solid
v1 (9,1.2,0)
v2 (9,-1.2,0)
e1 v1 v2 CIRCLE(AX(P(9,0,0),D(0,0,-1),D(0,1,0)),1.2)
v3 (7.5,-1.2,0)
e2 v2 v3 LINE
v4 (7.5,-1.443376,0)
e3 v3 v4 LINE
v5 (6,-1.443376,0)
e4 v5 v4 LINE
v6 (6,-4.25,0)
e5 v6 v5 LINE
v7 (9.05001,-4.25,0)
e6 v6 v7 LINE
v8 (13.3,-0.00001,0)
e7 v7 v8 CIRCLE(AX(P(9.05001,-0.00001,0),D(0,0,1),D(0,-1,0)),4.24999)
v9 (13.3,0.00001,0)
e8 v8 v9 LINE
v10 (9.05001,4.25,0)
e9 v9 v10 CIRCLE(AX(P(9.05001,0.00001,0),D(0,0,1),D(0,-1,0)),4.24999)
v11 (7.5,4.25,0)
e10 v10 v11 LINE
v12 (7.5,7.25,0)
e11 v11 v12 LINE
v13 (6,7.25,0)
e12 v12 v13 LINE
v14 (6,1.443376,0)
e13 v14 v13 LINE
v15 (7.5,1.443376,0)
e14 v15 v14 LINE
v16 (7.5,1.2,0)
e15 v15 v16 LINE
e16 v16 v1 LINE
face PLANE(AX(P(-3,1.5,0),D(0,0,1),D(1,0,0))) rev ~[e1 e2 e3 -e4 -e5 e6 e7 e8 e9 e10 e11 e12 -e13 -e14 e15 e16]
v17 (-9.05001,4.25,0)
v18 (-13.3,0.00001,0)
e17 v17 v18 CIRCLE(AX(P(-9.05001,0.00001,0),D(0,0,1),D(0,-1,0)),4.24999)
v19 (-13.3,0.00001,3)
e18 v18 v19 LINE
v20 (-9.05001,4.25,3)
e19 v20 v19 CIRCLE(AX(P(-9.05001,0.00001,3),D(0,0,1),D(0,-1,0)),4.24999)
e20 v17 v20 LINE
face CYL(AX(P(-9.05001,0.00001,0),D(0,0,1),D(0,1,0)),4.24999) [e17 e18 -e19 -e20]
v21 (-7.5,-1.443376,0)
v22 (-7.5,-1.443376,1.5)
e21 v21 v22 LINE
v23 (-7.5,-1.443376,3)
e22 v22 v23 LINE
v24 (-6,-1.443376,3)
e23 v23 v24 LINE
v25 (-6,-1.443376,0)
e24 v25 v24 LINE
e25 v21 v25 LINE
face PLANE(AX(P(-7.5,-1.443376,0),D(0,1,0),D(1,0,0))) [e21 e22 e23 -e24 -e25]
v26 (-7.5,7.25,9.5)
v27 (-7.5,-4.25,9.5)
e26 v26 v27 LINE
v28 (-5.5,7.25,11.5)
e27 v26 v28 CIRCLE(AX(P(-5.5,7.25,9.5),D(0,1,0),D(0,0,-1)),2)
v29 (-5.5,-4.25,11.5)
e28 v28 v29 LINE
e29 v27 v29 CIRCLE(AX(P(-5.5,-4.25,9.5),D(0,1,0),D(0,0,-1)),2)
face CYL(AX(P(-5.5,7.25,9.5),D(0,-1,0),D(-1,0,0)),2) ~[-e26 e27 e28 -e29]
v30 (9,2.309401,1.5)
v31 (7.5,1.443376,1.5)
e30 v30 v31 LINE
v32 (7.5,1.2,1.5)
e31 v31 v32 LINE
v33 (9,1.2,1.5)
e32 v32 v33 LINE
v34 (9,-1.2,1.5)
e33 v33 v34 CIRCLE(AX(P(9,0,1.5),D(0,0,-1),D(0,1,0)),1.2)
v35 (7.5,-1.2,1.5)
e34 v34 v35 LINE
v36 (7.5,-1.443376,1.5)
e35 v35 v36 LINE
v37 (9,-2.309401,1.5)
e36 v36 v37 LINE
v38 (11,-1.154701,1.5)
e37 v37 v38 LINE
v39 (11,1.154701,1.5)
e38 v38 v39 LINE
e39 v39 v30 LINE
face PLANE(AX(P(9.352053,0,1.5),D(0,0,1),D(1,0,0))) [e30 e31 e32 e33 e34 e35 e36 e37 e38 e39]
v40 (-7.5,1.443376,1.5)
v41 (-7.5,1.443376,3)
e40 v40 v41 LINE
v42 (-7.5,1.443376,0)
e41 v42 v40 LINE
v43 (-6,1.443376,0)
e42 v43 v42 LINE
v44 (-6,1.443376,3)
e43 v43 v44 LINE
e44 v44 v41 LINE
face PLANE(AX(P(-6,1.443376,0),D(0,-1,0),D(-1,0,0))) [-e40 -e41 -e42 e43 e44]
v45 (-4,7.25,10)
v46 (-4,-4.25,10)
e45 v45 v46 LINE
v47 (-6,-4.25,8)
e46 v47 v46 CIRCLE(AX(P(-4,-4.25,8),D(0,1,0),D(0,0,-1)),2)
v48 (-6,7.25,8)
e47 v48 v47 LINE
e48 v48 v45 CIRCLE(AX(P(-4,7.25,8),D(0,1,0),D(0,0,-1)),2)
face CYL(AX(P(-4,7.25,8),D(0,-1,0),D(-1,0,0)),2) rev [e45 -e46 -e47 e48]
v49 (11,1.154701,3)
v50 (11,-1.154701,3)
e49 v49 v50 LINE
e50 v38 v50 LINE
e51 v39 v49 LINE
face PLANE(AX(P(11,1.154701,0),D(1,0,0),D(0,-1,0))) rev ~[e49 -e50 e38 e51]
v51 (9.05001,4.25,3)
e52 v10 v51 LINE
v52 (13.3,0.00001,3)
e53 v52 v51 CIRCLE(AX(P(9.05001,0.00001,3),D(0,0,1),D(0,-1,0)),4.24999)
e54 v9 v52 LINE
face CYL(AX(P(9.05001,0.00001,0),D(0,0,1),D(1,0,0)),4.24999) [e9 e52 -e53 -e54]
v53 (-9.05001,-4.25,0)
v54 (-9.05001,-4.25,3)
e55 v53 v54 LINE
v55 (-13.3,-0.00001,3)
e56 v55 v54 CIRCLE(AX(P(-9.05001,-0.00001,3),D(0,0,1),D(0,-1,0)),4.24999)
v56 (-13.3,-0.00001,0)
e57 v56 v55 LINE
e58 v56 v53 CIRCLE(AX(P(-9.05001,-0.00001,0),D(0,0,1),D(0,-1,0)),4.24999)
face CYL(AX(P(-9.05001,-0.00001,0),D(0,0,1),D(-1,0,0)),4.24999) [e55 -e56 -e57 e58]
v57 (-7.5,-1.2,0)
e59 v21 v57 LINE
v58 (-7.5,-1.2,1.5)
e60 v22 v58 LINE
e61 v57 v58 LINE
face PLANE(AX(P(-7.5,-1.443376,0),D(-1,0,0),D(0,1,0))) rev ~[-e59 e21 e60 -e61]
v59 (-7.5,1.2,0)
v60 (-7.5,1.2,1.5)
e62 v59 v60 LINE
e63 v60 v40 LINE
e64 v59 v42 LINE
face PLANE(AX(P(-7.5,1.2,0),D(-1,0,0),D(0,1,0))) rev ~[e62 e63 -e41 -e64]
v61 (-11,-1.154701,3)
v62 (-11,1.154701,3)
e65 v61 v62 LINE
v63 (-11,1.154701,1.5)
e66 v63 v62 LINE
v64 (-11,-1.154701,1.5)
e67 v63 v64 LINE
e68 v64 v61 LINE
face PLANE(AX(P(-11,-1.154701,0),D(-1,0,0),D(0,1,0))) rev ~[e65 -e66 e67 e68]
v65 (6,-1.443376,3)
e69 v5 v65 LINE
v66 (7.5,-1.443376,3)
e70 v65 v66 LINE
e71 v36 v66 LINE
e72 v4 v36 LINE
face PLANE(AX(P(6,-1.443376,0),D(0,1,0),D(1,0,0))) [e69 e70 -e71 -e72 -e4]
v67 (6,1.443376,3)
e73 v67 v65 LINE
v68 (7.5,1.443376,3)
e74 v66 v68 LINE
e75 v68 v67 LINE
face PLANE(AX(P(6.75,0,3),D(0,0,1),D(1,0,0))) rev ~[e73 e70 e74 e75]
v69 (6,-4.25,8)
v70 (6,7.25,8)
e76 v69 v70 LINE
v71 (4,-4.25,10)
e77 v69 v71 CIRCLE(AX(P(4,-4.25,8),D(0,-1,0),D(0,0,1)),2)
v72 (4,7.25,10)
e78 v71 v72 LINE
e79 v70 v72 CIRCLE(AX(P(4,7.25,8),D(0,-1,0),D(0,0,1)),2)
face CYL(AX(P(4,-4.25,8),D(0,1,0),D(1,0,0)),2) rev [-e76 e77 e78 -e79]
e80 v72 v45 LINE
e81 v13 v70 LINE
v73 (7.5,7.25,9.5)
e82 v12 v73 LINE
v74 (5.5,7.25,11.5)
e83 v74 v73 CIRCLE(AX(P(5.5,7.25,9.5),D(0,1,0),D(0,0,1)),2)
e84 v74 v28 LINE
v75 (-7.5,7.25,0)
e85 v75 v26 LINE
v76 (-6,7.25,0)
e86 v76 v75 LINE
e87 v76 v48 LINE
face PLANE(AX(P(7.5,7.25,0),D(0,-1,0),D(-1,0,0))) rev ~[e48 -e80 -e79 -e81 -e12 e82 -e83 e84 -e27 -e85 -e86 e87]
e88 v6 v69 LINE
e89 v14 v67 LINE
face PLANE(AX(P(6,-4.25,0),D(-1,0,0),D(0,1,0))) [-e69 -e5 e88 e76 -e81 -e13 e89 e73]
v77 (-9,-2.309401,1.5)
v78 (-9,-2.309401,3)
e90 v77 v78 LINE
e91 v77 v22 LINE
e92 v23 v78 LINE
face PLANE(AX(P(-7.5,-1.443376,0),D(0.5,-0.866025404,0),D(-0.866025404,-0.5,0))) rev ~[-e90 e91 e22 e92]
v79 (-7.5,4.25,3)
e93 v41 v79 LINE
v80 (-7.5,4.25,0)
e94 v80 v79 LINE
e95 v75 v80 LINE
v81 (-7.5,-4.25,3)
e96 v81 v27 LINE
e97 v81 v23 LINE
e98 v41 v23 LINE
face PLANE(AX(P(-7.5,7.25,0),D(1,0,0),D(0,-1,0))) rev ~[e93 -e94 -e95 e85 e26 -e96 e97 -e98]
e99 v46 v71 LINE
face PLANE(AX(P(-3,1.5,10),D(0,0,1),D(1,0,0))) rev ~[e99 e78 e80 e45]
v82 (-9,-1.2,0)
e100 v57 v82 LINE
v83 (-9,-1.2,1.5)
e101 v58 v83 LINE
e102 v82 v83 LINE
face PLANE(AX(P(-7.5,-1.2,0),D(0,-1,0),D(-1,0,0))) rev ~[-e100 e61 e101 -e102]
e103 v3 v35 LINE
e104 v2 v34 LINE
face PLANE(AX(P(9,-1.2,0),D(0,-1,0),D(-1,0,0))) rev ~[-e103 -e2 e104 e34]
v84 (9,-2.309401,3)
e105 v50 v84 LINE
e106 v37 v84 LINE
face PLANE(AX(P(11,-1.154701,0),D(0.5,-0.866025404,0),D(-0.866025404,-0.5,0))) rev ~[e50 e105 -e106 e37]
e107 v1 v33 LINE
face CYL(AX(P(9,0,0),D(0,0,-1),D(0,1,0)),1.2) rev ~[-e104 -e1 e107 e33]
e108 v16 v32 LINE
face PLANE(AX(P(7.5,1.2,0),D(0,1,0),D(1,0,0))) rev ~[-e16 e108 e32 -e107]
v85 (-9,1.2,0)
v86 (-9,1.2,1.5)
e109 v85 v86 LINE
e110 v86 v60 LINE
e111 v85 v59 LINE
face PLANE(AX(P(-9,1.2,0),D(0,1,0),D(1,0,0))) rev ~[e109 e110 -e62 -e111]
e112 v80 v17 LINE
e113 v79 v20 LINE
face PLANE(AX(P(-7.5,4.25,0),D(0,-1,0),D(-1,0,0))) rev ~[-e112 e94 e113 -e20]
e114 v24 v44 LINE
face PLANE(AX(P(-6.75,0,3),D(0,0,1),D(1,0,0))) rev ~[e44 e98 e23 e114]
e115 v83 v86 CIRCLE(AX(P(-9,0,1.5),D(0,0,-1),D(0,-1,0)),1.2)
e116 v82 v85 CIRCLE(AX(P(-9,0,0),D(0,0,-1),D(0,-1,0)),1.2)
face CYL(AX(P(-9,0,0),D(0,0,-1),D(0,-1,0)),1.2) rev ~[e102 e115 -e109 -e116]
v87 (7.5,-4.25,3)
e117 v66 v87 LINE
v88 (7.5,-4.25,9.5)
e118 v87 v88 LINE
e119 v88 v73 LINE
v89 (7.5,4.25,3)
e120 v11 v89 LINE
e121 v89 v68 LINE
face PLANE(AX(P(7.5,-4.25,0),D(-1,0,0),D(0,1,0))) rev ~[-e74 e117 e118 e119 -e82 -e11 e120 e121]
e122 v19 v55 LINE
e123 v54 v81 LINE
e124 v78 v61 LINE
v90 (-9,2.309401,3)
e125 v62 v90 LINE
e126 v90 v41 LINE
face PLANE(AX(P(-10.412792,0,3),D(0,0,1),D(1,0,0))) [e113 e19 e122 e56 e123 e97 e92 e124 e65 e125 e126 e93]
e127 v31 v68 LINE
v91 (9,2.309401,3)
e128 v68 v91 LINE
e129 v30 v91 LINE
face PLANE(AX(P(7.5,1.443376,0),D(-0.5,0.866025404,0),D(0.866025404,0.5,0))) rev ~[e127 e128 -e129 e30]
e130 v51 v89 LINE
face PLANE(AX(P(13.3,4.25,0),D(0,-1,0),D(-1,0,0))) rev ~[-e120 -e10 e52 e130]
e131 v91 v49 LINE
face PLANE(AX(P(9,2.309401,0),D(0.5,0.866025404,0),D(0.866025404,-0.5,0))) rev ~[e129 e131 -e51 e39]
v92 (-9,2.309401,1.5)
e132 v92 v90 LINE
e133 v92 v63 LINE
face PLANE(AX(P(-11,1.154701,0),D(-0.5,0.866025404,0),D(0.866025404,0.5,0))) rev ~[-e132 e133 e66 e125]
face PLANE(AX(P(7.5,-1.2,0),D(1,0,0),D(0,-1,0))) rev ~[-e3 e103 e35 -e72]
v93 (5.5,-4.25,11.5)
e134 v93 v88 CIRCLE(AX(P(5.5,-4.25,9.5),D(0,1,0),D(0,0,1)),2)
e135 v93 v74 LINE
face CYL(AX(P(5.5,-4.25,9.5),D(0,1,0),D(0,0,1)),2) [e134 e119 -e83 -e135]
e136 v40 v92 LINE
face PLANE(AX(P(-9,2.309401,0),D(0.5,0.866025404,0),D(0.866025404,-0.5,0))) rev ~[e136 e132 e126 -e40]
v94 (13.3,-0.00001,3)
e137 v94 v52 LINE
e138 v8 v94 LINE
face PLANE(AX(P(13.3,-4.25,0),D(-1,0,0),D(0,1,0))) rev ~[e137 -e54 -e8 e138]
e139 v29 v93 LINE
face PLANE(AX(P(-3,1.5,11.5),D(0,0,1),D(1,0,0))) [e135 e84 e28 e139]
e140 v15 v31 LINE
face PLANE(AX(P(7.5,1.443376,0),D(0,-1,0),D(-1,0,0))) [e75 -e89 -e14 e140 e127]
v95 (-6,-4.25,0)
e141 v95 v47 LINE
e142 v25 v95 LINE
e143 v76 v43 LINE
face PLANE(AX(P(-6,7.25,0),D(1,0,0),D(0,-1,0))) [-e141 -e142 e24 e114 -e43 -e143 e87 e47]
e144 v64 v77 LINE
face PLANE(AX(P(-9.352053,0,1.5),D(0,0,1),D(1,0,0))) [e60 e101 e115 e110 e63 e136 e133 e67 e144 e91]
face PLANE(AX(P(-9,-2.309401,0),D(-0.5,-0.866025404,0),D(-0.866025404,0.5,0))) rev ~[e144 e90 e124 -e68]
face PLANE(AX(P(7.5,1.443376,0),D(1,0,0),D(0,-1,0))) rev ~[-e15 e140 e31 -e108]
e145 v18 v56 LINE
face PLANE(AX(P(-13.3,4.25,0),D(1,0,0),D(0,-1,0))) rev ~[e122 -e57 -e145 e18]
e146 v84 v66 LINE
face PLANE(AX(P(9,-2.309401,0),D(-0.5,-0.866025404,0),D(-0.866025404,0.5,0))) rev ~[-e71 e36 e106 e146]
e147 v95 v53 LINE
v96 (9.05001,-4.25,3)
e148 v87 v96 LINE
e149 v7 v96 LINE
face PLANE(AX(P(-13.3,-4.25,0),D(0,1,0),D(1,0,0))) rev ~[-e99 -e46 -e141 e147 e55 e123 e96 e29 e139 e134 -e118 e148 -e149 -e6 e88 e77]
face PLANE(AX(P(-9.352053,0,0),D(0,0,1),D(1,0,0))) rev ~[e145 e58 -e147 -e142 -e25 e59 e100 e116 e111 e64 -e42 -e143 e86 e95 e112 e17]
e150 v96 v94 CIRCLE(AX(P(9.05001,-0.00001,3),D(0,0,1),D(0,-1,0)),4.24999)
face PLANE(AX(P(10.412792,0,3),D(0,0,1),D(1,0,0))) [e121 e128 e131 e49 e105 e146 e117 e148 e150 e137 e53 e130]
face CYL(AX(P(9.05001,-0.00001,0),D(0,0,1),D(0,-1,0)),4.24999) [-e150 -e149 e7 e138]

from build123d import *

# Parameters (mm, degrees)
F0_W     = 1.5
F0_H     = 2.806624327
F1_DEPTH = 11.5
F2_DEPTH = 10
F3_DEPTH = 3
F4_DEPTH = 3
F5_DEPTH = 1.5
F6_R     = 4.24999
F7_R     = 2


# Not quite as in the source:
# - a fillet or chamfer is up to 0.001 mm smaller than in the source, because OpenCascade refuses the exact size


with BuildPart() as f1:
    # F0 (on Top) → F1 (new body)
    with BuildSketch(Plane.XY):
        Polygon((-6, 7.25), (-6, 1.443375673), (-6, -1.443375673), (-6, -4.25), (0, -4.25), (0, 7.25), align=None)
        Polygon((-7.5, 4.25), (-7.5, 1.443375673), (-6, 1.443375673), (-6, 7.25), (-7.5, 7.25), align=None)
        Polygon((-7.5, 1.443375673), (-7.5, 1.1999995727), (-7.5, -1.1999995727), (-7.5, -1.443375673), (-6, -1.443375673), (-6, 1.443375673), align=None)
        with Locations((-6.75, -2.8466878365)):
            Rectangle(F0_W, F0_H)
        Polygon((6, 7.25), (0, 7.25), (0, -4.25), (6, -4.25), (6, -1.443375673), (6, 1.443375673), align=None)
        Polygon((7.5, 7.25), (6, 7.25), (6, 1.443375673), (7.5, 1.443375673), (7.5, 4.25), align=None)
        Polygon((7.5, 1.443375673), (6, 1.443375673), (6, -1.443375673), (7.5, -1.443375673), (7.5, -1.1999995727), (7.5, 1.1999995727), align=None)
        with Locations((6.75, -2.8466878365)):
            Rectangle(F0_W, F0_H)
    extrude(amount=F1_DEPTH)

    # F0 (on Top) → F2 (cut)
    with BuildSketch(Plane.XY):
        Polygon((-6, 7.25), (-6, 1.443375673), (-6, -1.443375673), (-6, -4.25), (0, -4.25), (0, 7.25), align=None)
        Polygon((6, 7.25), (0, 7.25), (0, -4.25), (6, -4.25), (6, -1.443375673), (6, 1.443375673), align=None)
    extrude(amount=F2_DEPTH, mode=Mode.SUBTRACT)

    # F0 (on Top) → F3 (cut)
    with BuildSketch(Plane.XY):
        Polygon((-7.5, 1.443375673), (-7.5, 1.1999995727), (-7.5, -1.1999995727), (-7.5, -1.443375673), (-6, -1.443375673), (-6, 1.443375673), align=None)
        Polygon((7.5, 1.443375673), (6, 1.443375673), (6, -1.443375673), (7.5, -1.443375673), (7.5, -1.1999995727), (7.5, 1.1999995727), align=None)
    extrude(amount=F3_DEPTH, mode=Mode.SUBTRACT)

    # F0 (on Top) → F4 (join)
    with BuildSketch(Plane.XY):
        Polygon((-9, 2.3094010768), (-7.5, 1.443375673), (-7.5, 4.25), (-13.3, 4.25), (-13.3, -4.25), (-7.5, -4.25), (-7.5, -1.443375673), (-9, -2.3094010768), (-11, -1.1547005384), (-11, 1.1547005384), align=None)
        Polygon((7.5, -1.443375673), (7.5, -4.25), (13.3, -4.25), (13.3, 4.25), (7.5, 4.25), (7.5, 1.443375673), (9, 2.3094010768), (11, 1.1547005384), (11, -1.1547005384), (9, -2.3094010768), align=None)
    extrude(amount=F4_DEPTH)

    # F0 (on Top) → F5 (join)
    with BuildSketch(Plane.XY):
        with BuildLine():
            ThreePointArc((-9, -1.1999995727), (-10.1999995727, 0), (-9, 1.1999995727))
            Line((-9, 1.1999995727), (-7.5, 1.1999995727))
            Line((-7.5, 1.1999995727), (-7.5, 1.443375673))
            Line((-7.5, 1.443375673), (-9, 2.3094010768))
            Line((-9, 2.3094010768), (-11, 1.1547005384))
            Line((-11, 1.1547005384), (-11, -1.1547005384))
            Line((-11, -1.1547005384), (-9, -2.3094010768))
            Line((-9, -2.3094010768), (-7.5, -1.443375673))
            Line((-7.5, -1.443375673), (-7.5, -1.1999995727))
            Line((-7.5, -1.1999995727), (-9, -1.1999995727))
        make_face()
        with BuildLine():
            Line((9, 2.3094010768), (7.5, 1.443375673))
            Line((7.5, 1.443375673), (7.5, 1.1999995727))
            Line((7.5, 1.1999995727), (9, 1.1999995727))
            ThreePointArc((9, 1.1999995727), (10.1999995727, 0), (9, -1.1999995727))
            Line((9, -1.1999995727), (7.5, -1.1999995727))
            Line((7.5, -1.1999995727), (7.5, -1.443375673))
            Line((7.5, -1.443375673), (9, -2.3094010768))
            Line((9, -2.3094010768), (11, -1.1547005384))
            Line((11, -1.1547005384), (11, 1.1547005384))
            Line((11, 1.1547005384), (9, 2.3094010768))
        make_face()
    extrude(amount=F5_DEPTH)

    # F6 (radius 4.25 in the source; OpenCascade refuses exactly that, so slightly less here)
    f6_edges = [f1.edges().sort_by_distance(p)[0] for p in [
        (-13.3, -4.25, 1.5),
        (-13.3, 4.25, 1.5),
        (13.3, 4.25, 1.5),
        (13.3, -4.25, 1.5),
    ]]
    fillet(f6_edges, radius=F6_R)

    # F7
    f7_edges = [f1.edges().sort_by_distance(p)[0] for p in [
        (6, 1.5, 10),
        (7.5, 1.5, 11.5),
        (-7.5, 1.5, 11.5),
        (-6, 1.5, 10),
    ]]
    fillet(f7_edges, radius=F7_R)


solid = f1.part
